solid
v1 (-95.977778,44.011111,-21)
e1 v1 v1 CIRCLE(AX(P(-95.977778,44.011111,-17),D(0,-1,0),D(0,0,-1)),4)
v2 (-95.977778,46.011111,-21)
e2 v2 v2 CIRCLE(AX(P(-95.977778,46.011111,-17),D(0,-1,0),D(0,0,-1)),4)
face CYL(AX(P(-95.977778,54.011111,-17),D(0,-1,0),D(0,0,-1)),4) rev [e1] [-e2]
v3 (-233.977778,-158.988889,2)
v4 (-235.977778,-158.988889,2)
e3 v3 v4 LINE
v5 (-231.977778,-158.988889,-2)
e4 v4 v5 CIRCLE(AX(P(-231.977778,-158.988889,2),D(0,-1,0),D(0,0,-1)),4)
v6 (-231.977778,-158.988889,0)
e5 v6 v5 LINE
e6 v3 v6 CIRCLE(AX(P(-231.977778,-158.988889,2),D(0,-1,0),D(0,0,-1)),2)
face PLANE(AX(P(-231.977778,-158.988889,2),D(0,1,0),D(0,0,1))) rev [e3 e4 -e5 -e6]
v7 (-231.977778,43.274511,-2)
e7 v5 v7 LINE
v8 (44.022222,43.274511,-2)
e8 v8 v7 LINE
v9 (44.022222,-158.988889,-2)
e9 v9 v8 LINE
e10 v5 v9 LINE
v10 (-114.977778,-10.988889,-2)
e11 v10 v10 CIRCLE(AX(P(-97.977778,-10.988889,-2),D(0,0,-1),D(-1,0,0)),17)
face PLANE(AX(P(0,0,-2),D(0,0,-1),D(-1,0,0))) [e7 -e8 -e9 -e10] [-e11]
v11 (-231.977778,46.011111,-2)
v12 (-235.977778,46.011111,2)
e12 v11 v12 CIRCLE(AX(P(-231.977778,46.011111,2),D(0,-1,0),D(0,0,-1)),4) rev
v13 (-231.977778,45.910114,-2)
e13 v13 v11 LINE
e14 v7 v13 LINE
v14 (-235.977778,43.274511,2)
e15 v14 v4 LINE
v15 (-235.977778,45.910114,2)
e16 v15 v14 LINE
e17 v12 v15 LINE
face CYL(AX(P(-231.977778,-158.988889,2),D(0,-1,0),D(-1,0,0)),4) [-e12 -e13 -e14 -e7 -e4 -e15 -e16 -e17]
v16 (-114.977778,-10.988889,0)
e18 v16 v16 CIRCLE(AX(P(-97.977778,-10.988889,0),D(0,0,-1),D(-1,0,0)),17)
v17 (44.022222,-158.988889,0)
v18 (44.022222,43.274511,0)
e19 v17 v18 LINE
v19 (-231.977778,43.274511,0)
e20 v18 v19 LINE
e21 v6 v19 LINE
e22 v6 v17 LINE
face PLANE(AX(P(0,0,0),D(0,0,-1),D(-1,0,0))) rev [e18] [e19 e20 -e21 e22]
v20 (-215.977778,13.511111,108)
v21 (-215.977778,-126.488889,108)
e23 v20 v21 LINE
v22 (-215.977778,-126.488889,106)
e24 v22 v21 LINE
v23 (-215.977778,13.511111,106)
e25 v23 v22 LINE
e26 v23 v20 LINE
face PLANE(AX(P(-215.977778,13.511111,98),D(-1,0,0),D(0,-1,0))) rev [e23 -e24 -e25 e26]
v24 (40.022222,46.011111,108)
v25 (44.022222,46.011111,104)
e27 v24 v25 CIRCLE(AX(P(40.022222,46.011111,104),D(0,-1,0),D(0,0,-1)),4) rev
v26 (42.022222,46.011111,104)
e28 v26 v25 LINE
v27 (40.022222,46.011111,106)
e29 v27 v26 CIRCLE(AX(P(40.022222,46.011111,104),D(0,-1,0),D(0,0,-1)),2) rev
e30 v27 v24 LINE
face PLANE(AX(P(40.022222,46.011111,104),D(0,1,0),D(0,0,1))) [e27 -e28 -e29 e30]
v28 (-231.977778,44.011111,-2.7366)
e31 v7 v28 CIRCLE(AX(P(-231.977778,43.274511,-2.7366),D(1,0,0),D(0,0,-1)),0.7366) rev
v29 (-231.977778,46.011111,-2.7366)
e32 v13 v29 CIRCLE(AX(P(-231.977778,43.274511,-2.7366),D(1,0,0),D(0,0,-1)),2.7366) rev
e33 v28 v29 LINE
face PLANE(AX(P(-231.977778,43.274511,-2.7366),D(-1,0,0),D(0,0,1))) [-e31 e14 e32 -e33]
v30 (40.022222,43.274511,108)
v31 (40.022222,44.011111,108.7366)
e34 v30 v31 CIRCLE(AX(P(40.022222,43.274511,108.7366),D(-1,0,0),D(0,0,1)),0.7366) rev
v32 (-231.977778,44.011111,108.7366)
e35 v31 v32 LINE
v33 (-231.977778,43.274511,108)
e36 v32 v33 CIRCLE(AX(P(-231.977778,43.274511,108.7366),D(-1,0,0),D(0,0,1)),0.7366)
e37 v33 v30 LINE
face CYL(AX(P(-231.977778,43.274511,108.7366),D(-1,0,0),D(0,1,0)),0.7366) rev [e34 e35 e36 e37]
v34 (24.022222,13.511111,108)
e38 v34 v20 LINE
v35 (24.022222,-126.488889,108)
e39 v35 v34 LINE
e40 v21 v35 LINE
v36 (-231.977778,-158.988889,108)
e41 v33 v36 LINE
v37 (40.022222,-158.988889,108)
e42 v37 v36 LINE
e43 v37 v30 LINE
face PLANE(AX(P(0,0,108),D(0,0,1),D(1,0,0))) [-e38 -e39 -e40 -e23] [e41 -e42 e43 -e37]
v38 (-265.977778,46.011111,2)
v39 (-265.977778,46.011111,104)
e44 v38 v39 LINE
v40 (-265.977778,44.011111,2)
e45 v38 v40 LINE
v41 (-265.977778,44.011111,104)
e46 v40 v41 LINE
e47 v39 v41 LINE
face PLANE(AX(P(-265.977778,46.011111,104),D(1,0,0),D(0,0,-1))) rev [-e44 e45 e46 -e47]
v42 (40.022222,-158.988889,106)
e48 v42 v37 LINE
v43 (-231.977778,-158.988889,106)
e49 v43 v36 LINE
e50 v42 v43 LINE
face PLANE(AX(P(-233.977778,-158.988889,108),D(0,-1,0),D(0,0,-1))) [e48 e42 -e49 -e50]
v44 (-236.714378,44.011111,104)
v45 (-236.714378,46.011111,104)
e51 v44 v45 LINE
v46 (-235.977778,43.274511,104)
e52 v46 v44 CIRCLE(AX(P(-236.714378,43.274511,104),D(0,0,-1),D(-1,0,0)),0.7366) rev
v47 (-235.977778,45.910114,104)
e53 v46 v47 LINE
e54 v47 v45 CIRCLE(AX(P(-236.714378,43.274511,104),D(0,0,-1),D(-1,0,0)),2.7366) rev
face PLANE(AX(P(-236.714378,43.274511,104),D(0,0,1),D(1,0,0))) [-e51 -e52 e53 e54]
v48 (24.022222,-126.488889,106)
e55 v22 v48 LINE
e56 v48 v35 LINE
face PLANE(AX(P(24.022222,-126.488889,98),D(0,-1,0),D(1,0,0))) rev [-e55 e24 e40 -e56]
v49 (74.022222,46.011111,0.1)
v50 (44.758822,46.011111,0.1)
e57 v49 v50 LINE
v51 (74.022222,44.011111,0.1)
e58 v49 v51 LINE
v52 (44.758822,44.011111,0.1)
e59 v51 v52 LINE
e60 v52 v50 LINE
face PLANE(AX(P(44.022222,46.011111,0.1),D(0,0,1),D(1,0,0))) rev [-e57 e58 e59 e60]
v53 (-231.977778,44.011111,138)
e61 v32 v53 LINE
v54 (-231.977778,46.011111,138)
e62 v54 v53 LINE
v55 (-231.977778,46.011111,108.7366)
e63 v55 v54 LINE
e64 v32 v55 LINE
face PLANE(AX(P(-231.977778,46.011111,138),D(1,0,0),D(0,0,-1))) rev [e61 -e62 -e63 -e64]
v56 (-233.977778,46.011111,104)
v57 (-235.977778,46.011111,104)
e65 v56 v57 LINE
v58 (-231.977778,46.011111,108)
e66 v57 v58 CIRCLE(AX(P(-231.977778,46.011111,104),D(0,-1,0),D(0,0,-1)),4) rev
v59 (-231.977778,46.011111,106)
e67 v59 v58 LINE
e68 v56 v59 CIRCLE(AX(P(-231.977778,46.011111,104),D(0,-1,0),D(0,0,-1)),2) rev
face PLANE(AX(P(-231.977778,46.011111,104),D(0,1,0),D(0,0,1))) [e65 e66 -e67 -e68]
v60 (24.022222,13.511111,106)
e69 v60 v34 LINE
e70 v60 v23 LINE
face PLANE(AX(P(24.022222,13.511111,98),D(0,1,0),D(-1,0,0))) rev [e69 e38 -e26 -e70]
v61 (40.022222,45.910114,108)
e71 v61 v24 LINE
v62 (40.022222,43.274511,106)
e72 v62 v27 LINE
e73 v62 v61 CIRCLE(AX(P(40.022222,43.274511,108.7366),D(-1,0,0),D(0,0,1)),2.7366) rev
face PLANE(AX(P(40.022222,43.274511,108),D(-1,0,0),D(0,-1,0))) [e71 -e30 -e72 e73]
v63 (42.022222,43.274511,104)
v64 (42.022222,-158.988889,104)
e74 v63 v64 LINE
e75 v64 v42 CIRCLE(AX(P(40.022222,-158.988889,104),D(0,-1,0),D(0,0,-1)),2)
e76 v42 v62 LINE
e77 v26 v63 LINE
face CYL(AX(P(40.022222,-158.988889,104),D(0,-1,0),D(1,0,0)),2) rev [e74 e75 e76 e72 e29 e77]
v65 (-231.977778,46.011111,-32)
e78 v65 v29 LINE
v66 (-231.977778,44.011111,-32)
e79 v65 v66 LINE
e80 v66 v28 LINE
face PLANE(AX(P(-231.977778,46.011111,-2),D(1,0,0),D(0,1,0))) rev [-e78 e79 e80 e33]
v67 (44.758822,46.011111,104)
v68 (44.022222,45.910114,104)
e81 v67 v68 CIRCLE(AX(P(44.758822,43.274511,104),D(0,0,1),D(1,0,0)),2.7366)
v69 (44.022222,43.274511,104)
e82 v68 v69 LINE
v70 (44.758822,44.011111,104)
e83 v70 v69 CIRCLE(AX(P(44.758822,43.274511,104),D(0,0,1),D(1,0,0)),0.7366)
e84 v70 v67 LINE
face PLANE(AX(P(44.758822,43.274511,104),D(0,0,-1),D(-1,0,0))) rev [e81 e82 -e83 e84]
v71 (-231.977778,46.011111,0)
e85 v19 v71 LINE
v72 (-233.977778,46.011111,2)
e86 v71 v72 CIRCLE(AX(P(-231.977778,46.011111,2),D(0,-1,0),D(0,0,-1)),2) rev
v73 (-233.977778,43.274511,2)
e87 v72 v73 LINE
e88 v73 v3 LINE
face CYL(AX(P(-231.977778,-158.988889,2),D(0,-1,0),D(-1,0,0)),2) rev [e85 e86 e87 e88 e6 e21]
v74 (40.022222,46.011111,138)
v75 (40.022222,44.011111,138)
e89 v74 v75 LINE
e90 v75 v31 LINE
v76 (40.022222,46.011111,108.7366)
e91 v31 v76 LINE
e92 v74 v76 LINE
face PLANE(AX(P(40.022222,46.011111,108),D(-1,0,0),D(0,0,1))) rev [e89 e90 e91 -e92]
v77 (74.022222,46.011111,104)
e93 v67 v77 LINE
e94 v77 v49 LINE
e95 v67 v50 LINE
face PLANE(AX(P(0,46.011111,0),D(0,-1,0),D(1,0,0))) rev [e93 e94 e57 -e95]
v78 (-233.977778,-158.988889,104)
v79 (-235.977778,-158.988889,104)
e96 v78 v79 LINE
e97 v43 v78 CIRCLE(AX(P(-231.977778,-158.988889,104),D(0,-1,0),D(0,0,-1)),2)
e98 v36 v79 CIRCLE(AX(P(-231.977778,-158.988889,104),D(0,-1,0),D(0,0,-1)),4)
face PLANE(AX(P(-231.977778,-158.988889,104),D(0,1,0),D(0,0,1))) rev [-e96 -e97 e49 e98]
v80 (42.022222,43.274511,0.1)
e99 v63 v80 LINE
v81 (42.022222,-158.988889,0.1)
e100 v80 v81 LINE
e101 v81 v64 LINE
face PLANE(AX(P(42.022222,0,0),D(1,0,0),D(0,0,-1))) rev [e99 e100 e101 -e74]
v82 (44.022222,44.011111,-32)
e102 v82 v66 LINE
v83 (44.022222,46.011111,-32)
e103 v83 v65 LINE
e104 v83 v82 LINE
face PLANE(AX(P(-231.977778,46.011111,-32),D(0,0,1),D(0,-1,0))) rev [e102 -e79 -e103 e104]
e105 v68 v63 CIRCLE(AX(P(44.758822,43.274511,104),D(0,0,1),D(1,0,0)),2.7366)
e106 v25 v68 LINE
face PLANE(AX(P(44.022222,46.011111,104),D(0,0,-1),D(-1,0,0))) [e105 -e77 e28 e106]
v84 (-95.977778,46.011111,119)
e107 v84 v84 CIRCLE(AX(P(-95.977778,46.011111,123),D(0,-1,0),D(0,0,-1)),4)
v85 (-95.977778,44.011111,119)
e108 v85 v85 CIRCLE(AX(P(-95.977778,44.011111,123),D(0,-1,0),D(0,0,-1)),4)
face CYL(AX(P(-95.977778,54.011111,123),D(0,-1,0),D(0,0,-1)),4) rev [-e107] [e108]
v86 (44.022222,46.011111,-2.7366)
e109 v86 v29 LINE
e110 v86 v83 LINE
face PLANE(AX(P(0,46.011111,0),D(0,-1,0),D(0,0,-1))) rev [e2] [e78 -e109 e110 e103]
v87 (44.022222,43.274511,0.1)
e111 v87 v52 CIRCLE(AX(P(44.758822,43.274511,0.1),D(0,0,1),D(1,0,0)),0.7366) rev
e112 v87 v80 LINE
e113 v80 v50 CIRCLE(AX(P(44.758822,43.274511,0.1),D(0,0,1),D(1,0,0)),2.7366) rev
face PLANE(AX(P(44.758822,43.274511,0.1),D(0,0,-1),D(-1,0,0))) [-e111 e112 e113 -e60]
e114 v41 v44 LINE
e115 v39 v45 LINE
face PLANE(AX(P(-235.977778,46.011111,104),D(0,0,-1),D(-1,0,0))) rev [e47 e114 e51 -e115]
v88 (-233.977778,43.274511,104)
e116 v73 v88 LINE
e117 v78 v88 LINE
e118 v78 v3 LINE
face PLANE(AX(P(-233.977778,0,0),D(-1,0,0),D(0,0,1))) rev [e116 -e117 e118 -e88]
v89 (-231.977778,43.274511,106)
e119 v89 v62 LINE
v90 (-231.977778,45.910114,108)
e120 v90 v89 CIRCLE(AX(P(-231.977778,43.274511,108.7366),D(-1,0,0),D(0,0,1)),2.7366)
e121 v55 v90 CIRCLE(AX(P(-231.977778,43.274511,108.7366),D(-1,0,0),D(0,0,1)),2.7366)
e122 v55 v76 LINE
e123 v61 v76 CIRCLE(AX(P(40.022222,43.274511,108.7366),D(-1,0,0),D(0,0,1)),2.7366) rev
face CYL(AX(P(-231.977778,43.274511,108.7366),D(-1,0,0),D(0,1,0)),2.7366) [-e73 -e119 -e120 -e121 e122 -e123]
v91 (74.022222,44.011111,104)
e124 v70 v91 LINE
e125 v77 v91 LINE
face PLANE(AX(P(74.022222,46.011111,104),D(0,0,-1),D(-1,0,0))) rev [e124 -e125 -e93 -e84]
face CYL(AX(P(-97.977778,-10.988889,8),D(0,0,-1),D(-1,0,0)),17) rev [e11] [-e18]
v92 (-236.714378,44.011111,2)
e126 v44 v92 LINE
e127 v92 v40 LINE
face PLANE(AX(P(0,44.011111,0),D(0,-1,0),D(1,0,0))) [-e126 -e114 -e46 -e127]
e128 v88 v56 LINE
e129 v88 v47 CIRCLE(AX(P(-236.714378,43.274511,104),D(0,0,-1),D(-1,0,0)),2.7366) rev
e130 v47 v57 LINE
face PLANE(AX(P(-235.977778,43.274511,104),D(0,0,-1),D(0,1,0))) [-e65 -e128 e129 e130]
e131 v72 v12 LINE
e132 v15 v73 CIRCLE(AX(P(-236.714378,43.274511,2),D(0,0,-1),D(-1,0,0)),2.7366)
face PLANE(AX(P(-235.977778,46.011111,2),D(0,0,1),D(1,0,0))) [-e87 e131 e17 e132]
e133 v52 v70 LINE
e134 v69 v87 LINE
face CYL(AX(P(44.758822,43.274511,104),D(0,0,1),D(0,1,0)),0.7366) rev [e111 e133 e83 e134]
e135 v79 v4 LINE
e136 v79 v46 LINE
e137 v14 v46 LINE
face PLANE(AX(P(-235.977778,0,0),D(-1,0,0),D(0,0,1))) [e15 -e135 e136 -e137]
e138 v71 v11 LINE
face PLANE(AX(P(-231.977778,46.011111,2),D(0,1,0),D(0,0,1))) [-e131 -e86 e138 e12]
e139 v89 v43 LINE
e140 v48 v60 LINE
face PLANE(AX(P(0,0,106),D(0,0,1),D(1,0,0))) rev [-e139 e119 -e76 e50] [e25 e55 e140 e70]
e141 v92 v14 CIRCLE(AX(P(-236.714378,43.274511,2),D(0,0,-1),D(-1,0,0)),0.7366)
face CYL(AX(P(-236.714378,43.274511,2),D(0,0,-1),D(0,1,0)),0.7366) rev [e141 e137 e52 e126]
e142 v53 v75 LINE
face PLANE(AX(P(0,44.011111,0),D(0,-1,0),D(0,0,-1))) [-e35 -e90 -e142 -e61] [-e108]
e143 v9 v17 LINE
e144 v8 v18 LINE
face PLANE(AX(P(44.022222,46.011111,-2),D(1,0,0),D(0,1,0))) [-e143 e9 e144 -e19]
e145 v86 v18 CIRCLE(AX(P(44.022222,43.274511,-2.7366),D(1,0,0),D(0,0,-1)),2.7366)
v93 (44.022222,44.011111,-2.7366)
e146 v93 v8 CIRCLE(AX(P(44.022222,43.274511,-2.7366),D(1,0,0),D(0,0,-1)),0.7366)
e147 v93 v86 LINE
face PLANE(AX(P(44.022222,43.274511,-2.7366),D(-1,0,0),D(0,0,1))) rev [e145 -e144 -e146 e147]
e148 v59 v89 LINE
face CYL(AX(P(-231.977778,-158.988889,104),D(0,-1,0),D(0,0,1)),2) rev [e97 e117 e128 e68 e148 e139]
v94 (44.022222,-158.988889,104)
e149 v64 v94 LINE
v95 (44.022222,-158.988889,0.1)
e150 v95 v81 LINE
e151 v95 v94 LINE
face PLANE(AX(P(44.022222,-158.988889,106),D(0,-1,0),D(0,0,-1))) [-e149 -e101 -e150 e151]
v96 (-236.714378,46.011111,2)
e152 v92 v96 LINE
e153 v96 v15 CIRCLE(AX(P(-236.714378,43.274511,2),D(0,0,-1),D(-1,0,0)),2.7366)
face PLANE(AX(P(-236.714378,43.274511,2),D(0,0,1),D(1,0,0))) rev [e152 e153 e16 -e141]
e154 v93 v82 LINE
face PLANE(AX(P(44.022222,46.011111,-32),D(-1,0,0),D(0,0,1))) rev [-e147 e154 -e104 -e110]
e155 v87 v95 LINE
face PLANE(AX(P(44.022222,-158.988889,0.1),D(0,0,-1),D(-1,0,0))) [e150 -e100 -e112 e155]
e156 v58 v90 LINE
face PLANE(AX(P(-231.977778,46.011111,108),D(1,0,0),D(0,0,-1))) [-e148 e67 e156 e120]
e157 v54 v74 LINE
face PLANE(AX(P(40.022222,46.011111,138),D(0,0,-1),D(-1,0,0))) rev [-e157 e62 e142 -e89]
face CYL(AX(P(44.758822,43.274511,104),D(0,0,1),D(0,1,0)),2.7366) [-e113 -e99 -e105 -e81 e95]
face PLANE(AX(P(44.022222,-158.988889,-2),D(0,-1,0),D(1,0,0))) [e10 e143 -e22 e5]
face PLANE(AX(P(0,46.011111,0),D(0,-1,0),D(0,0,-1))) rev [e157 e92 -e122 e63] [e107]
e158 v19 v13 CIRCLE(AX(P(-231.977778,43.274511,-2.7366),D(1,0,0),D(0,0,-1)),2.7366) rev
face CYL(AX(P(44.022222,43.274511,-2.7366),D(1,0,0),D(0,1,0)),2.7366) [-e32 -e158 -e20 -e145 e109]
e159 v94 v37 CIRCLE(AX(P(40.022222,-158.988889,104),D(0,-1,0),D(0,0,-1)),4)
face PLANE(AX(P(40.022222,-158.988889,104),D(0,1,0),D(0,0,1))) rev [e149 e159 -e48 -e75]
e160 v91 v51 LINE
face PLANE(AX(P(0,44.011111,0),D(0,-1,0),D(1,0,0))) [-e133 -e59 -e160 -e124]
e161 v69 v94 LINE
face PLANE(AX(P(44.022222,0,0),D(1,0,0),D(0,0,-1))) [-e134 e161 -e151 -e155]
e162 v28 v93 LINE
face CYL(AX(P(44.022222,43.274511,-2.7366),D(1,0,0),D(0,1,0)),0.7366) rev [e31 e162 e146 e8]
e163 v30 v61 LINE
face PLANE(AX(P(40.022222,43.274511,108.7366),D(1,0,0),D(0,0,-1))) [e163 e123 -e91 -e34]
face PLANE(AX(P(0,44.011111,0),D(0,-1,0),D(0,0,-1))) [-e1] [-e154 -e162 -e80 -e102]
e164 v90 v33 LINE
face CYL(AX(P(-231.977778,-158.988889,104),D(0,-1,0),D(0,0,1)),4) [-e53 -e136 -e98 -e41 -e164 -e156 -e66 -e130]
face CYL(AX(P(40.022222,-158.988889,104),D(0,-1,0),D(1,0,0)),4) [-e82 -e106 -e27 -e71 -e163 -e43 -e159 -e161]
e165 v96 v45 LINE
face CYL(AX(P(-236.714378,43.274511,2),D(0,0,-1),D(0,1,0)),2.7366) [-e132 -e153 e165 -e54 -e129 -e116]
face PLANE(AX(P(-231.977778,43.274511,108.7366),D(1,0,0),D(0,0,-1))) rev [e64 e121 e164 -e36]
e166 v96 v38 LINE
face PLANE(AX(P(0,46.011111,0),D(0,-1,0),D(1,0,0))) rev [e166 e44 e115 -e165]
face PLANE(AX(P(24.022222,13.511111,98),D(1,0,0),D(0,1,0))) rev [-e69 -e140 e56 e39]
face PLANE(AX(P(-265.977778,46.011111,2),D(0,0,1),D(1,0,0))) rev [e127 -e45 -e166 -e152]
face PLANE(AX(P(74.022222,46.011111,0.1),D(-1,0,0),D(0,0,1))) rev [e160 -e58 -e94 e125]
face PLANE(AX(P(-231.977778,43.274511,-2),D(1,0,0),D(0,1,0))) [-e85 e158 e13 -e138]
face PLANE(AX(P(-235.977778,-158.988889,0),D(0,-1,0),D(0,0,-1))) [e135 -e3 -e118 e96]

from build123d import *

# Parameters (mm, degrees)
SKETCH1_W                       = 280
SKETCH1_H                       = 205
BASE_FLANGE1_DEPTH              = 2
EDGE_FLANGE1_STRIP_W            = 12
EDGE_FLANGE1_STRIP_H            = 2
EDGE_FLANGE1_STRIP_CUT_DEPTH    = 205
EDGE_FLANGE1_DEPTH              = 205
EDGE_FLANGE2_STRIP_W            = 12
EDGE_FLANGE2_STRIP_H            = 2
EDGE_FLANGE2_STRIP_CUT_DEPTH    = 205
EDGE_FLANGE2_DEPTH              = 205
EDGE_FLANGE3_STRIP_W            = 12
EDGE_FLANGE3_STRIP_H            = 2
EDGE_FLANGE3_STRIP_CUT_DEPTH    = 205
EDGE_FLANGE3_DEPTH              = 205
SKETCH15_W                      = 240
SKETCH15_H                      = 140
CUT_EXTRUDE1_DEPTH              = 10
SKETCH16_R                      = 17
CUT_EXTRUDE2_DEPTH              = 10
EDGE_FLANGE11_STRIP_W           = 9.4732
EDGE_FLANGE11_STRIP_H           = 2
EDGE_FLANGE11_STRIP_CUT_DEPTH   = 276
EDGE_FLANGE11_STRIP_2_W         = 9.4732
EDGE_FLANGE11_STRIP_2_H         = 2
EDGE_FLANGE11_STRIP_CUT_2_DEPTH = 102
EDGE_FLANGE11_STRIP_3_W         = 9.4732
EDGE_FLANGE11_STRIP_3_H         = 2
EDGE_FLANGE11_STRIP_CUT_3_DEPTH = 272
EDGE_FLANGE11_STRIP_4_W         = 9.4732
EDGE_FLANGE11_STRIP_4_H         = 2
EDGE_FLANGE11_STRIP_CUT_4_DEPTH = 103.9
EDGE_FLANGE11_DEPTH             = 276
EDGE_FLANGE11_BEND_DEPTH        = 102
EDGE_FLANGE11_BEND_2_DEPTH      = 272
EDGE_FLANGE11_BEND_3_DEPTH      = 103.9
SKETCH55_R                      = 4
CUT_EXTRUDE3_DEPTH              = 10


# Sheet-metal steps are written as plain solids
with BuildPart() as part:
    # Sketch1 → Base-Flange1 (new body)
    with BuildSketch(Plane.XY):
        with Locations((-95.977777778, -56.488888889)):
            Rectangle(SKETCH1_W, SKETCH1_H)
    extrude(amount=-BASE_FLANGE1_DEPTH)

    # Edge-Flange1 strip (across the edge) → Edge-Flange1 strip cut (cut)
    with BuildSketch(Plane(origin=(-235.977777778, 46.011111111, 0), x_dir=(1, 0, 0), z_dir=(0, -1, 0))):
        with Locations((-2, -1)):
            Rectangle(EDGE_FLANGE1_STRIP_W, EDGE_FLANGE1_STRIP_H)
    extrude(amount=EDGE_FLANGE1_STRIP_CUT_DEPTH, mode=Mode.SUBTRACT)

    # Edge-Flange1 section (across the edge) → Edge-Flange1 (add)
    with BuildSketch(Plane(origin=(-235.977777778, 46.011111111, 0), x_dir=(1, 0, 0), z_dir=(0, -1, 0))):
        with BuildLine():
            Line((0, 2), (0, 108))
            Line((0, 108), (2, 108))
            Line((2, 108), (2, 2))
            ThreePointArc((2, 2), (2.585786438, 0.585786438), (4, 0))
            Line((4, 0), (4, -2))
            ThreePointArc((4, -2), (1.171572875, -0.828427125), (0, 2))
        make_face()
    extrude(amount=EDGE_FLANGE1_DEPTH)

    # Edge-Flange2 strip (across the edge) → Edge-Flange2 strip cut (cut)
    with BuildSketch(Plane(origin=(-233.977777778, 46.011111111, 108), x_dir=(0, 0, -1), z_dir=(0, -1, 0))):
        with Locations((-2, -1)):
            Rectangle(EDGE_FLANGE2_STRIP_W, EDGE_FLANGE2_STRIP_H)
    extrude(amount=EDGE_FLANGE2_STRIP_CUT_DEPTH, mode=Mode.SUBTRACT)

    # Edge-Flange2 section (across the edge) → Edge-Flange2 (add)
    with BuildSketch(Plane(origin=(-233.977777778, 46.011111111, 108), x_dir=(0, 0, -1), z_dir=(0, -1, 0))):
        with BuildLine():
            Line((0, 2), (0, 278))
            Line((0, 278), (2, 278))
            Line((2, 278), (2, 2))
            ThreePointArc((2, 2), (2.585786438, 0.585786438), (4, 0))
            Line((4, 0), (4, -2))
            ThreePointArc((4, -2), (1.171572875, -0.828427125), (0, 2))
        make_face()
    extrude(amount=EDGE_FLANGE2_DEPTH)

    # Edge-Flange3 strip (across the edge) → Edge-Flange3 strip cut (cut)
    with BuildSketch(Plane(origin=(44.022222222, 46.011111111, 106), x_dir=(-1, 0, 0), z_dir=(0, -1, 0))):
        with Locations((-2, -1)):
            Rectangle(EDGE_FLANGE3_STRIP_W, EDGE_FLANGE3_STRIP_H)
    extrude(amount=EDGE_FLANGE3_STRIP_CUT_DEPTH, mode=Mode.SUBTRACT)

    # Edge-Flange3 section (across the edge) → Edge-Flange3 (add)
    with BuildSketch(Plane(origin=(44.022222222, 46.011111111, 106), x_dir=(-1, 0, 0), z_dir=(0, -1, 0))):
        with BuildLine():
            Line((0, 2), (0, 105.9))
            Line((0, 105.9), (2, 105.9))
            Line((2, 105.9), (2, 2))
            ThreePointArc((2, 2), (2.585786438, 0.585786438), (4, 0))
            Line((4, 0), (4, -2))
            ThreePointArc((4, -2), (1.171572875, -0.828427125), (0, 2))
        make_face()
    extrude(amount=EDGE_FLANGE3_DEPTH)

    # Sketch15 → Cut-Extrude1 (cut)
    with BuildSketch(Plane.XY.offset(108)):
        with Locations((-95.977777778, -56.488888889)):
            Rectangle(SKETCH15_W, SKETCH15_H)
    extrude(amount=-CUT_EXTRUDE1_DEPTH, mode=Mode.SUBTRACT)

    # Sketch16 → Cut-Extrude2 (cut)
    with BuildSketch(Plane(origin=(0, 0, -2), x_dir=(-1, 0, 0), z_dir=(0, 0, -1))):
        with Locations((97.977777778, -10.988888889)):
            Circle(SKETCH16_R)
    extrude(amount=-CUT_EXTRUDE2_DEPTH, mode=Mode.SUBTRACT)

    # Edge-Flange11 strip (across the edge) → Edge-Flange11 strip cut (cut)
    with BuildSketch(Plane(origin=(-231.977777778, 46.011111111, -2), x_dir=(0, -1, 0), z_dir=(1, 0, 0))):
        with Locations((-2, -1)):
            Rectangle(EDGE_FLANGE11_STRIP_W, EDGE_FLANGE11_STRIP_H)
    extrude(amount=EDGE_FLANGE11_STRIP_CUT_DEPTH, mode=Mode.SUBTRACT)

    # Edge-Flange11 strip 2 (across the edge) → Edge-Flange11 strip cut 2 (cut)
    with BuildSketch(Plane(origin=(-235.977777778, 46.011111111, 104), x_dir=(0, -1, 0), z_dir=(0, 0, -1))):
        with Locations((-2, -1)):
            Rectangle(EDGE_FLANGE11_STRIP_2_W, EDGE_FLANGE11_STRIP_2_H)
    extrude(amount=EDGE_FLANGE11_STRIP_CUT_2_DEPTH, mode=Mode.SUBTRACT)

    # Edge-Flange11 strip 3 (across the edge) → Edge-Flange11 strip cut 3 (cut)
    with BuildSketch(Plane(origin=(40.022222222, 46.011111111, 108), x_dir=(0, -1, 0), z_dir=(-1, 0, 0))):
        with Locations((-2, -1)):
            Rectangle(EDGE_FLANGE11_STRIP_3_W, EDGE_FLANGE11_STRIP_3_H)
    extrude(amount=EDGE_FLANGE11_STRIP_CUT_3_DEPTH, mode=Mode.SUBTRACT)

    # Edge-Flange11 strip 4 (across the edge) → Edge-Flange11 strip cut 4 (cut)
    with BuildSketch(Plane(origin=(44.022222222, 46.011111111, 0.1), x_dir=(0, -1, 0), z_dir=(0, 0, 1))):
        with Locations((-2, -1)):
            Rectangle(EDGE_FLANGE11_STRIP_4_W, EDGE_FLANGE11_STRIP_4_H)
    extrude(amount=EDGE_FLANGE11_STRIP_CUT_4_DEPTH, mode=Mode.SUBTRACT)

    # Edge-Flange11 section (across the edge) → Edge-Flange11 (add)
    with BuildSketch(Plane(origin=(-231.977777778, 46.011111111, -2), x_dir=(0, -1, 0), z_dir=(1, 0, 0))):
        with BuildLine():
            Line((0, 0.7366), (0, 30))
            Line((0, 30), (2, 30))
            Line((2, 30), (2, 0.7366))
            ThreePointArc((2, 0.7366), (2.215745145, 0.215745145), (2.7366, 0))
            Line((2.7366, 0), (2.7366, -2))
            ThreePointArc((2.7366, -2), (0.801531583, -1.198468417), (0, 0.7366))
        make_face()
    extrude(amount=EDGE_FLANGE11_DEPTH)

    # Edge-Flange11 section 2 (across the edge) → Edge-Flange11 bend (add)
    with BuildSketch(Plane(origin=(-235.977777778, 46.011111111, 104), x_dir=(0, -1, 0), z_dir=(0, 0, -1))):
        with BuildLine():
            Line((0, 0.7366), (0, 30))
            Line((0, 30), (2, 30))
            Line((2, 30), (2, 0.7366))
            ThreePointArc((2, 0.7366), (2.215745145, 0.215745145), (2.7366, 0))
            Line((2.7366, 0), (2.7366, -2))
            ThreePointArc((2.7366, -2), (0.801531583, -1.198468417), (0, 0.7366))
        make_face()
    extrude(amount=EDGE_FLANGE11_BEND_DEPTH)

    # Edge-Flange11 section 3 (across the edge) → Edge-Flange11 bend 2 (add)
    with BuildSketch(Plane(origin=(40.022222222, 46.011111111, 108), x_dir=(0, -1, 0), z_dir=(-1, 0, 0))):
        with BuildLine():
            Line((0, 0.7366), (0, 30))
            Line((0, 30), (2, 30))
            Line((2, 30), (2, 0.7366))
            ThreePointArc((2, 0.7366), (2.215745145, 0.215745145), (2.7366, 0))
            Line((2.7366, 0), (2.7366, -2))
            ThreePointArc((2.7366, -2), (0.801531583, -1.198468417), (0, 0.7366))
        make_face()
    extrude(amount=EDGE_FLANGE11_BEND_2_DEPTH)

    # Edge-Flange11 section 4 (across the edge) → Edge-Flange11 bend 3 (add)
    with BuildSketch(Plane(origin=(44.022222222, 46.011111111, 0.1), x_dir=(0, -1, 0), z_dir=(0, 0, 1))):
        with BuildLine():
            Line((0, 0.7366), (0, 30))
            Line((0, 30), (2, 30))
            Line((2, 30), (2, 0.7366))
            ThreePointArc((2, 0.7366), (2.215745145, 0.215745145), (2.7366, 0))
            Line((2.7366, 0), (2.7366, -2))
            ThreePointArc((2.7366, -2), (0.801531583, -1.198468417), (0, 0.7366))
        make_face()
    extrude(amount=EDGE_FLANGE11_BEND_3_DEPTH)

    # Sketch55 → Cut-Extrude3 (cut)
    with BuildSketch(Plane.XZ.offset(-44.011111111)):
        with Locations(Location((-95.977777778, -17, 0), (0, 0, 270))):
            Circle(SKETCH55_R)
        with Locations(Location((-95.977777778, 123, 0), (0, 0, 270))):
            Circle(SKETCH55_R)
    extrude(amount=-CUT_EXTRUDE3_DEPTH, mode=Mode.SUBTRACT)


solid = part.part
